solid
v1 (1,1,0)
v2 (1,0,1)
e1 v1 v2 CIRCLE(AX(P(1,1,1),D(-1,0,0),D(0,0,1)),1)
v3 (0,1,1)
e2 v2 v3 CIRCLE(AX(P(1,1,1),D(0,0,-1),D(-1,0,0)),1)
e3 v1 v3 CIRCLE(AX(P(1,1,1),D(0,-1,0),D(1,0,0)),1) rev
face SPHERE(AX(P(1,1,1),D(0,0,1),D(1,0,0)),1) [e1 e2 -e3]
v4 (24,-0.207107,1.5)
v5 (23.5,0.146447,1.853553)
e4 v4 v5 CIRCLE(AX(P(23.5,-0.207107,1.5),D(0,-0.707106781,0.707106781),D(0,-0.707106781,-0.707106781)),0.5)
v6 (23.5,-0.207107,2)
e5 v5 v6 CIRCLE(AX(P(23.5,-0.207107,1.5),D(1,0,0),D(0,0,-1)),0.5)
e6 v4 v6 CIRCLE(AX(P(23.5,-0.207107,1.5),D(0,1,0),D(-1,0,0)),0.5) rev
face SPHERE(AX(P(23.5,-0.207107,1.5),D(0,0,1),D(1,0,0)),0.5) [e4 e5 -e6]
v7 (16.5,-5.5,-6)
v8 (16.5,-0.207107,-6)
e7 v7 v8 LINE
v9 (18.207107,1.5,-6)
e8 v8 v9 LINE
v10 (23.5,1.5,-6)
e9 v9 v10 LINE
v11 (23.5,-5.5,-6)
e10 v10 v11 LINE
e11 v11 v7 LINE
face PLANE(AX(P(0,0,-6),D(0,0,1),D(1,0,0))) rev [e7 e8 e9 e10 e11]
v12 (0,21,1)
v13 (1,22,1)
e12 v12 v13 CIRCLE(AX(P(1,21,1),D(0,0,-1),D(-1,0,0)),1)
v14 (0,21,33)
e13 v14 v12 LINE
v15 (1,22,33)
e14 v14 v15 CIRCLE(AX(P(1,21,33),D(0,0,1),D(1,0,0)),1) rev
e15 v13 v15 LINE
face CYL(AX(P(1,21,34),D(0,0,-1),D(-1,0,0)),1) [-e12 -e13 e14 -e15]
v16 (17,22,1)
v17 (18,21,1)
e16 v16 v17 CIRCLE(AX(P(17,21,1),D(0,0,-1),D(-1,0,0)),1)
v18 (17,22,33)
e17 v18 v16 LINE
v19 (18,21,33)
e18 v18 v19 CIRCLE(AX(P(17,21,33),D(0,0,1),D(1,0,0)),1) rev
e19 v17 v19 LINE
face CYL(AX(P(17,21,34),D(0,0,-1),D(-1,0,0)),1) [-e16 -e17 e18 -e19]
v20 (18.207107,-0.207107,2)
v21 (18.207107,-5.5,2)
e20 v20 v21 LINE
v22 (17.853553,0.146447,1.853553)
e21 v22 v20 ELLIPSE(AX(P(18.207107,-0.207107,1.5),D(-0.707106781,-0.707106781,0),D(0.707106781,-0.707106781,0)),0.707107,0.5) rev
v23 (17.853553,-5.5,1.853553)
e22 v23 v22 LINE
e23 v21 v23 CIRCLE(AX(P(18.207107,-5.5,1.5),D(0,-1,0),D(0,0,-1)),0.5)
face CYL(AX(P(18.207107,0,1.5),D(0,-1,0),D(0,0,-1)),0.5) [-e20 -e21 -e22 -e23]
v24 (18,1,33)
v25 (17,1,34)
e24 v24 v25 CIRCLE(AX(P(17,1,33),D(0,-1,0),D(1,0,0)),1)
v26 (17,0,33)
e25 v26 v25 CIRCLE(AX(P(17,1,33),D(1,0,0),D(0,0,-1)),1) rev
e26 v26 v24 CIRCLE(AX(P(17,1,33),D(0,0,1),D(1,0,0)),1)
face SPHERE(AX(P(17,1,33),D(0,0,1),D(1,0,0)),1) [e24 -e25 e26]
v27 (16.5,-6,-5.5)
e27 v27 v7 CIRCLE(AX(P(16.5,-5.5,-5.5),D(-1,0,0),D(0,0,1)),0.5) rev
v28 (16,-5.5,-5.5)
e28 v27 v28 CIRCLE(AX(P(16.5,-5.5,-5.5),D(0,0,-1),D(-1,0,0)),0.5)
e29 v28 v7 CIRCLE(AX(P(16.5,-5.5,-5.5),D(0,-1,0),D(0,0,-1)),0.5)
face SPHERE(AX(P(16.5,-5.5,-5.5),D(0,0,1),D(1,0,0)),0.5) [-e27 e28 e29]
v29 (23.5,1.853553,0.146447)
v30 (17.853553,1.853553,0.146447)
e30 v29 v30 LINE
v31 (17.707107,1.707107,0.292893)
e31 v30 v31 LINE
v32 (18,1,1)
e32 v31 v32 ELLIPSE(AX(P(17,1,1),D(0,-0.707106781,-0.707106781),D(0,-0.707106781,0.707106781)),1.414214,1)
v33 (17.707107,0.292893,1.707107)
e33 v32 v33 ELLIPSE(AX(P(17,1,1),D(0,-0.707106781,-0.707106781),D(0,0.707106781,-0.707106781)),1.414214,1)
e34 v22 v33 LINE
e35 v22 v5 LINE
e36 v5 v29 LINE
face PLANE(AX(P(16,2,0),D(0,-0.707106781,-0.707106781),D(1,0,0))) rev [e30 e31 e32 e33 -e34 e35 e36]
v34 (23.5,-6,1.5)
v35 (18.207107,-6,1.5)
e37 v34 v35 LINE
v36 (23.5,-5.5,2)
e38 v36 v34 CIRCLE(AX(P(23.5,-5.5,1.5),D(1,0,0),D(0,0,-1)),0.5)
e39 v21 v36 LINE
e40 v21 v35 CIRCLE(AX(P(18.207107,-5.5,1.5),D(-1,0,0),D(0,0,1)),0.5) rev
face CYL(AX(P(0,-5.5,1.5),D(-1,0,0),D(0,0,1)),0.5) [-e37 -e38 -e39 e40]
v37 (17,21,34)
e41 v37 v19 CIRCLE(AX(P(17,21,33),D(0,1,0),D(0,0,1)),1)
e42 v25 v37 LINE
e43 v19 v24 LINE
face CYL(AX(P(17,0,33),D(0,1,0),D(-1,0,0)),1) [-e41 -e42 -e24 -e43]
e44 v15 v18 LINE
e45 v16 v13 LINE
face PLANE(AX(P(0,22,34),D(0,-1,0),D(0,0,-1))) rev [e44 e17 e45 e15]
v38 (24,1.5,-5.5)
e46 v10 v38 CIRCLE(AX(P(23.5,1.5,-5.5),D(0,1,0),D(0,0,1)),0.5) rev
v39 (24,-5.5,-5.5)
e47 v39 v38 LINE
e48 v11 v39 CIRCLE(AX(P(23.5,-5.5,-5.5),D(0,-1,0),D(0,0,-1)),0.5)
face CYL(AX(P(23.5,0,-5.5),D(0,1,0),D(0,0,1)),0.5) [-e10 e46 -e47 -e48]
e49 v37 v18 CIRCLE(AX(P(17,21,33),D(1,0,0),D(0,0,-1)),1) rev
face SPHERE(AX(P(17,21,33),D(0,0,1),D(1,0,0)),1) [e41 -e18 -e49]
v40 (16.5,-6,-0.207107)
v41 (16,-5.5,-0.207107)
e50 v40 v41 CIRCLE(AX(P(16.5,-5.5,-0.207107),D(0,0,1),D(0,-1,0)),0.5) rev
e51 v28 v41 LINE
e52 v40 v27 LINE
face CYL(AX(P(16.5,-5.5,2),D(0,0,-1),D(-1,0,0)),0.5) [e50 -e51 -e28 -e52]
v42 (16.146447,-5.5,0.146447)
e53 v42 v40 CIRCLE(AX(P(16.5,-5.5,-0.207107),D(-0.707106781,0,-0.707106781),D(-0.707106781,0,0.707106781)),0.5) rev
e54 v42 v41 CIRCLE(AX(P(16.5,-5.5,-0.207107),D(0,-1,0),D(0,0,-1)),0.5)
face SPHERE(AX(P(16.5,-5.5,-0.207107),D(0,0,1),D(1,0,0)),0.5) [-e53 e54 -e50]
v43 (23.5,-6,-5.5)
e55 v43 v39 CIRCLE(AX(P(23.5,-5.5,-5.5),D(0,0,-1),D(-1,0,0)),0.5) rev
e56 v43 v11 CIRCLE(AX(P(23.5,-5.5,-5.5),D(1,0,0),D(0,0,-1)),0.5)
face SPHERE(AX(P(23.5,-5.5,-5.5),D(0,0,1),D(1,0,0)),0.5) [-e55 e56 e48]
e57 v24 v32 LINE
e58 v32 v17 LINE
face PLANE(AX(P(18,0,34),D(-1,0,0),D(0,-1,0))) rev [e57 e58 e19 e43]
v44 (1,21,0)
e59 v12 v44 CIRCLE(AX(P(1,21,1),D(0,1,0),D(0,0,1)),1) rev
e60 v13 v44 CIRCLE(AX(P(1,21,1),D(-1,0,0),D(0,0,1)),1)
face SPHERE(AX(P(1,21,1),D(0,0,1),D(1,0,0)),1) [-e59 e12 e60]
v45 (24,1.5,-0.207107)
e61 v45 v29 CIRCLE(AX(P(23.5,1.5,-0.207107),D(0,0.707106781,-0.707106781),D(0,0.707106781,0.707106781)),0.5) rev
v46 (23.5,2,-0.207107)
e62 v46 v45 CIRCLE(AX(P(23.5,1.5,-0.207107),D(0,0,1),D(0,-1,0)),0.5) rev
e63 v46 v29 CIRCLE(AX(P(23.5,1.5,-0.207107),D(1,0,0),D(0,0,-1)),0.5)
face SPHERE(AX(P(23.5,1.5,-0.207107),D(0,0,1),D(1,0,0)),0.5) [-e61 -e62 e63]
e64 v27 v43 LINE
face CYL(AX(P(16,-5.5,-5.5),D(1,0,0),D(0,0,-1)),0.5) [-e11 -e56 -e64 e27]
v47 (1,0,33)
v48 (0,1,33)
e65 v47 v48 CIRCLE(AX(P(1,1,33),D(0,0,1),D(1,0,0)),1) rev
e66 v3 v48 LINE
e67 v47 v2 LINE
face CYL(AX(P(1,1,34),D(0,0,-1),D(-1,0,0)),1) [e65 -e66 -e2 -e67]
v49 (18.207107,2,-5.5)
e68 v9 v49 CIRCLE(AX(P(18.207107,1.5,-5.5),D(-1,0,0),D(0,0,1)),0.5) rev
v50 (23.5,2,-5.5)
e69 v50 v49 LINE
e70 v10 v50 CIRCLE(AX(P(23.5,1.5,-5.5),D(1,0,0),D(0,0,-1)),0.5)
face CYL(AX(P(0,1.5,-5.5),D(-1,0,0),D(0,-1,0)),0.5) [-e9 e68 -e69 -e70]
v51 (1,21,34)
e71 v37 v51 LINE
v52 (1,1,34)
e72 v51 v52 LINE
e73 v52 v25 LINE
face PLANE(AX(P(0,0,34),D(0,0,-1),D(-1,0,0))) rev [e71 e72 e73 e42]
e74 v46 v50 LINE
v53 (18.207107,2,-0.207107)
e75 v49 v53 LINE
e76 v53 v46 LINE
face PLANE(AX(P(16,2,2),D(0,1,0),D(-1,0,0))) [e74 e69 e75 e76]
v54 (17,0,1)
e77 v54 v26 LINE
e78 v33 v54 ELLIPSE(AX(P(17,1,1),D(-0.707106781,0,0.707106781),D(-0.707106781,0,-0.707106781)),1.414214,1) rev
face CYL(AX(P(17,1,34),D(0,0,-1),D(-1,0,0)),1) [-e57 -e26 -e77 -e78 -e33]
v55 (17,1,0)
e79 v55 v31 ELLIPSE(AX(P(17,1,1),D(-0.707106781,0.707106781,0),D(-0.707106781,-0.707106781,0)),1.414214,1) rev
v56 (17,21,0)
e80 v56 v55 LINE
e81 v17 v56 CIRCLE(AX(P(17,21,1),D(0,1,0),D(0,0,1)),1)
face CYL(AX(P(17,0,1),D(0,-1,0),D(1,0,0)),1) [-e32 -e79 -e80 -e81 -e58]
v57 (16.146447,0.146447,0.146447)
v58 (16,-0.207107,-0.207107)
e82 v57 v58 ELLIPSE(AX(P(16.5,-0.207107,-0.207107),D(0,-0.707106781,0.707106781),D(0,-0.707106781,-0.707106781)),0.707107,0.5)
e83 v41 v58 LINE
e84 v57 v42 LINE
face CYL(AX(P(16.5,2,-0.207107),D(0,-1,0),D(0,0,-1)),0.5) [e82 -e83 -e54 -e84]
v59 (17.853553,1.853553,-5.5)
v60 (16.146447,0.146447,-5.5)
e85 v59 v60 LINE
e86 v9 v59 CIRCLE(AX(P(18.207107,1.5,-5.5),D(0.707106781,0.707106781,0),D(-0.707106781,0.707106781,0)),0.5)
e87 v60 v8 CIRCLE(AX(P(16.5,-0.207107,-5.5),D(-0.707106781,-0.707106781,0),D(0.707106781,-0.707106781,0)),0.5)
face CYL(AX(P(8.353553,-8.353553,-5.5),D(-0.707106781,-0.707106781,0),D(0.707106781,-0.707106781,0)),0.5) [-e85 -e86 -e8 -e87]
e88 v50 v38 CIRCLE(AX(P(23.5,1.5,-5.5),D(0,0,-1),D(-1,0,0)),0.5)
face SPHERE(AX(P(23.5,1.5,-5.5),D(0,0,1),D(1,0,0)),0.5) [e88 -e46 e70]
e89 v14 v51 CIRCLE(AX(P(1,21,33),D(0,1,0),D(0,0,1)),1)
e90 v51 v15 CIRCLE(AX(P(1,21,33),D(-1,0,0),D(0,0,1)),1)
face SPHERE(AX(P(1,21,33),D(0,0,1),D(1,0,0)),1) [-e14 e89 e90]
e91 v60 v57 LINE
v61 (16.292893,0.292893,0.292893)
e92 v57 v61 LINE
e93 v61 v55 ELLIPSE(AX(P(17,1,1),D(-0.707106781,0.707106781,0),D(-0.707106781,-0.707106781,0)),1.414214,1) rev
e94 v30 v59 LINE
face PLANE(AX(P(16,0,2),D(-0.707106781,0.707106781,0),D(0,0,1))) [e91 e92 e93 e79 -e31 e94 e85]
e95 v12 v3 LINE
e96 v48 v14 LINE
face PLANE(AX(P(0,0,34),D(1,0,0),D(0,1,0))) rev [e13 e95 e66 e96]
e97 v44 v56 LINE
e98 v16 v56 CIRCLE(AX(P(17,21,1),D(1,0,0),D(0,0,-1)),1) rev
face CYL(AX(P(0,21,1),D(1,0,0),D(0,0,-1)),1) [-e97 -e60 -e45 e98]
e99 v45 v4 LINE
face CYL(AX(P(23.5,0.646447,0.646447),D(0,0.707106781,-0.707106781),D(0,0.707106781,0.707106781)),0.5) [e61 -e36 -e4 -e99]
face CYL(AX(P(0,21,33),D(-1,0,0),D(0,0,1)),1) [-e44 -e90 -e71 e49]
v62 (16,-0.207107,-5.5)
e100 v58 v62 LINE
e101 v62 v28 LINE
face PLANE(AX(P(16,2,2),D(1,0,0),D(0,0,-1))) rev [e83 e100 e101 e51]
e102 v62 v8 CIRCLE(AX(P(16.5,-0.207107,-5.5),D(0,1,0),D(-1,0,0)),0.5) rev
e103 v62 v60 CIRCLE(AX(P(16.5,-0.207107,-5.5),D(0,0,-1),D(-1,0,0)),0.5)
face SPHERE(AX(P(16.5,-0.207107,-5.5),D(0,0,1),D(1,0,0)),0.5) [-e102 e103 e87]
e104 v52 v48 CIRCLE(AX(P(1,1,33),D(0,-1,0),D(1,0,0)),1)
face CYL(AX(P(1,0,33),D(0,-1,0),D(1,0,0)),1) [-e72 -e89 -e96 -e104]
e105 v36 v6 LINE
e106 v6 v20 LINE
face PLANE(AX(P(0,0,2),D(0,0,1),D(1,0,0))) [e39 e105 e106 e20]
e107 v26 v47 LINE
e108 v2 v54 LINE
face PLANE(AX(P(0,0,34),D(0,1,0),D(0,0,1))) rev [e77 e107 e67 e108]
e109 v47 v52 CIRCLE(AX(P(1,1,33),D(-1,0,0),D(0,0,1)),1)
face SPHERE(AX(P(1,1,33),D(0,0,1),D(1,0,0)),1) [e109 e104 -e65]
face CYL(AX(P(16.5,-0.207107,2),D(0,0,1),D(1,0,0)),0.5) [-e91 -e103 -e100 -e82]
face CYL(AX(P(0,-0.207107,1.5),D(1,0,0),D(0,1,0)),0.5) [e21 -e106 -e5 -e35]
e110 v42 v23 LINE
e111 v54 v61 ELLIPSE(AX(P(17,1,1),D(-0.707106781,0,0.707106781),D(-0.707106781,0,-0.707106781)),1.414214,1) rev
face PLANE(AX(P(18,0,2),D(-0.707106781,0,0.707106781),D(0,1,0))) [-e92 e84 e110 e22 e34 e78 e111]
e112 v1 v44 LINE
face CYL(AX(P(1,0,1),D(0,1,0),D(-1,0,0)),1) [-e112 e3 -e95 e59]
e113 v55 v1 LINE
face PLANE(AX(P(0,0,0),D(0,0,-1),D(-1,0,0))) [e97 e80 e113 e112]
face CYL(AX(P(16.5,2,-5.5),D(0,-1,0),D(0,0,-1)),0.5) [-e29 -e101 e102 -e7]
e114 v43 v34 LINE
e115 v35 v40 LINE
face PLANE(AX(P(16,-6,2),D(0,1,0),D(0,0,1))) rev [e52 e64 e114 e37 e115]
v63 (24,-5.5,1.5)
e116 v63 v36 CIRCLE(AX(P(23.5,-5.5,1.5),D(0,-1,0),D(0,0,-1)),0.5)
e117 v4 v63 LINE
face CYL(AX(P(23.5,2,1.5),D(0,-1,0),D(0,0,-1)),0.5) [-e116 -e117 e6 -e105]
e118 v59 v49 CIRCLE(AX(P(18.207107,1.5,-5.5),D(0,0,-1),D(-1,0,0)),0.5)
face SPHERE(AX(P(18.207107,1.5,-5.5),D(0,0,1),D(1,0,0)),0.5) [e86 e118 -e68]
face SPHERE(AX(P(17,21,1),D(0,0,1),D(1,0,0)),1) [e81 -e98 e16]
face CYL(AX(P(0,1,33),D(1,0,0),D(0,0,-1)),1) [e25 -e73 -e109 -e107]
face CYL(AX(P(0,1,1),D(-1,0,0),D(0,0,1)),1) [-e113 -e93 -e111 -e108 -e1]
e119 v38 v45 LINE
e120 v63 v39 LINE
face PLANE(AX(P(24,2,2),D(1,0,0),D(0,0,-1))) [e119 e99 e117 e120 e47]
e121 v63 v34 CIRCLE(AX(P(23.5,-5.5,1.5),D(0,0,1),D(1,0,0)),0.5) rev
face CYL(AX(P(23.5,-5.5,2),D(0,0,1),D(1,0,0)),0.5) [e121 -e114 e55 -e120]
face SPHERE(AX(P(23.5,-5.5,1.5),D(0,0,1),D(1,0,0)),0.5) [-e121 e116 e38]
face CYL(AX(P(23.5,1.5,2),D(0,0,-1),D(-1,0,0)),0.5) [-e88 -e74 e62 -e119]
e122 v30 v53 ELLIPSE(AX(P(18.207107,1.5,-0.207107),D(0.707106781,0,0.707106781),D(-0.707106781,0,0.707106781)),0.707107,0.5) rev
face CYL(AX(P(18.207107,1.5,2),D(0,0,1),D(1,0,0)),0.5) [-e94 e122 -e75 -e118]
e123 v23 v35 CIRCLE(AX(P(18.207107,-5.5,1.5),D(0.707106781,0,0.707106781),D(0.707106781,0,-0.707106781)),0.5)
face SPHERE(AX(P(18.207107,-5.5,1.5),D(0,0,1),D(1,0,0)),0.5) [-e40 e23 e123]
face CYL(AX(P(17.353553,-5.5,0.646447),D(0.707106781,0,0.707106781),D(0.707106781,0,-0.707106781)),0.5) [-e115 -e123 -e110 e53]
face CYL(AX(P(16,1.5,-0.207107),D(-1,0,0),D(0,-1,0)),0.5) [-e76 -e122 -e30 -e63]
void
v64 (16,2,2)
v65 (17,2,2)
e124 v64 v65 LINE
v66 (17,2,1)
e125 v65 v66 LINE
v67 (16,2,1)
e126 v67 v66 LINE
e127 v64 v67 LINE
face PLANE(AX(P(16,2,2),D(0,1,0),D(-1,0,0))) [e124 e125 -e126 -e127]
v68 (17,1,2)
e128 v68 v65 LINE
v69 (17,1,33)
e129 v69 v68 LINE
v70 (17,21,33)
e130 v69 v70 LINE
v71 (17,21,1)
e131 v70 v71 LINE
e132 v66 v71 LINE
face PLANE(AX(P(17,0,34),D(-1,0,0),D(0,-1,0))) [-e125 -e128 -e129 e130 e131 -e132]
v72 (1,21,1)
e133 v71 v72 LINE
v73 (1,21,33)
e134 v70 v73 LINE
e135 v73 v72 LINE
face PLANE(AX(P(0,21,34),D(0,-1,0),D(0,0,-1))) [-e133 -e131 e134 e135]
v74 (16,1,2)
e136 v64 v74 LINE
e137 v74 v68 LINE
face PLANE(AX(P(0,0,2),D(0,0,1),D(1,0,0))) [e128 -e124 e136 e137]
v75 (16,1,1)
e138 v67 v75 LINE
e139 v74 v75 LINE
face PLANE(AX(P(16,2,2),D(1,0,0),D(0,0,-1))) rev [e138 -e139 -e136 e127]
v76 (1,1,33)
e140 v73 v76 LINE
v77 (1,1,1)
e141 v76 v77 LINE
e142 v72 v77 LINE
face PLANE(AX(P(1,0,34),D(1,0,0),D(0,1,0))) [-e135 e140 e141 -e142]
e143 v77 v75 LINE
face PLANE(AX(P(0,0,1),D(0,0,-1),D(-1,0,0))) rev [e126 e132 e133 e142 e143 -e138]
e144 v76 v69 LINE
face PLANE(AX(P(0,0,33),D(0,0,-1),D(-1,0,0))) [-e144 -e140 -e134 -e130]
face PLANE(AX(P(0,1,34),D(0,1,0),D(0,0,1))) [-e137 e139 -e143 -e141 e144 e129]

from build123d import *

# Parameters (mm, degrees)
SKETCH1_W                = 18
SKETCH1_H                = 22
BOSS_EXTRUDE1_DEPTH      = 34
SHELL1_T                 = 1
BOSS_EXTRUDE3_DEPTH      = 6
BOSS_EXTRUDE3_DEPTH_BACK = 2
SKETCH2_W                = 8
SKETCH2_H                = 8
CHAMFER2_SIZE            = 2
FILLET1_R                = 1
FILLET2_R                = 0.5


with BuildPart() as part:
    # Sketch1 → Boss-Extrude1 (new body)
    with BuildSketch(Plane.XY):
        with Locations((9, 11)):
            Rectangle(SKETCH1_W, SKETCH1_H)
    extrude(amount=BOSS_EXTRUDE1_DEPTH)

    # Shell1 (no face opened: a closed hollow body)
    add(offset(amount=-SHELL1_T, mode=Mode.PRIVATE), mode=Mode.SUBTRACT)

    # Sketch2 → Boss-Extrude3 (add, two sides: drawn at the far end of the back side and taken through both)
    with BuildSketch(Plane(origin=(0, 0, 0), x_dir=(-1, 0, 0), z_dir=(0, 0, -1)).offset(-BOSS_EXTRUDE3_DEPTH_BACK)):
        with Locations((-20, -2)):
            Rectangle(SKETCH2_W, SKETCH2_H)
    extrude(amount=BOSS_EXTRUDE3_DEPTH + BOSS_EXTRUDE3_DEPTH_BACK)

    # Chamfer2
    chamfer2_edges = [part.edges().sort_by_distance(p)[0] for p in [
        (16, -3, 2),
        (16, 2, -3),
        (21, 2, 2),
    ]]
    chamfer(chamfer2_edges, length=CHAMFER2_SIZE)

    # Fillet1
    # the kernel refuses this fillet: 1 mm, written as the material it takes off along each edge
    with BuildSketch(Plane(origin=(1, 21, 1), x_dir=(0, 1, 0), z_dir=(0, 0, -1))) as fillet1_piece_1_section:
        Polygon((0, 0), (FILLET1_R, 0), (FILLET1_R, -FILLET1_R), (0, -FILLET1_R), align=None)
    fillet1_piece_1 = extrude(amount=FILLET1_R, mode=Mode.PRIVATE)
    fillet1_piece_1 = fillet1_piece_1 - Plane(origin=(1, 21, 1), x_dir=(0.7071067811865476, -0.7071067811865475, 0), z_dir=(0, 0, -1)) * Sphere(FILLET1_R, mode=Mode.PRIVATE)
    add(fillet1_piece_1, mode=Mode.SUBTRACT)
    with BuildSketch(Plane(origin=(1, 1, 1), x_dir=(0, 0, -1), z_dir=(0, -1, 0))) as fillet1_piece_2_section:
        Polygon((0, 0), (FILLET1_R, 0), (FILLET1_R, -FILLET1_R), (0, -FILLET1_R), align=None)
    fillet1_piece_2 = extrude(amount=FILLET1_R, mode=Mode.PRIVATE)
    fillet1_piece_2 = fillet1_piece_2 - Plane(origin=(1, 1, 1), x_dir=(0.7071067811865475, 0, 0.7071067811865475), z_dir=(0, -1, 0)) * Sphere(FILLET1_R, mode=Mode.PRIVATE)
    add(fillet1_piece_2, mode=Mode.SUBTRACT)
    with BuildSketch(Plane(origin=(17, 21, 1), x_dir=(0, 0, -1), z_dir=(0, 1, 0))) as fillet1_piece_3_section:
        Polygon((0, 0), (FILLET1_R, 0), (FILLET1_R, -FILLET1_R), (0, -FILLET1_R), align=None)
    fillet1_piece_3 = extrude(amount=FILLET1_R, mode=Mode.PRIVATE)
    fillet1_piece_3 = fillet1_piece_3 - Plane(origin=(17, 21, 1), x_dir=(-0.7071067811865475, 0, 0.7071067811865475), z_dir=(0, 1, 0)) * Sphere(FILLET1_R, mode=Mode.PRIVATE)
    add(fillet1_piece_3, mode=Mode.SUBTRACT)
    with BuildSketch(Plane(origin=(1, 1, 33), x_dir=(-1, 0, 0), z_dir=(0, -1, 0))) as fillet1_piece_4_section:
        Polygon((0, 0), (FILLET1_R, 0), (FILLET1_R, -FILLET1_R), (0, -FILLET1_R), align=None)
    fillet1_piece_4 = extrude(amount=FILLET1_R, mode=Mode.PRIVATE)
    fillet1_piece_4 = fillet1_piece_4 - Plane(origin=(1, 1, 33), x_dir=(0.7071067811865475, 0, -0.7071067811865475), z_dir=(0, -1, 0)) * Sphere(FILLET1_R, mode=Mode.PRIVATE)
    add(fillet1_piece_4, mode=Mode.SUBTRACT)
    with BuildSketch(Plane(origin=(17, 1, 33), x_dir=(1, 0, 0), z_dir=(0, -1, 0))) as fillet1_piece_5_section:
        Polygon((0, 0), (FILLET1_R, 0), (FILLET1_R, FILLET1_R), (0, FILLET1_R), align=None)
    fillet1_piece_5 = extrude(amount=FILLET1_R, mode=Mode.PRIVATE)
    fillet1_piece_5 = fillet1_piece_5 - Plane(origin=(17, 1, 33), x_dir=(-0.7071067811865475, 0, -0.7071067811865475), z_dir=(0, -1, 0)) * Sphere(FILLET1_R, mode=Mode.PRIVATE)
    add(fillet1_piece_5, mode=Mode.SUBTRACT)
    with BuildSketch(Plane(origin=(17, 21, 33), x_dir=(1, 0, 0), z_dir=(0, 1, 0))) as fillet1_piece_6_section:
        Polygon((0, 0), (FILLET1_R, 0), (FILLET1_R, -FILLET1_R), (0, -FILLET1_R), align=None)
    fillet1_piece_6 = extrude(amount=FILLET1_R, mode=Mode.PRIVATE)
    fillet1_piece_6 = fillet1_piece_6 - Plane(origin=(17, 21, 33), x_dir=(-0.7071067811865475, 0, -0.7071067811865475), z_dir=(0, 1, 0)) * Sphere(FILLET1_R, mode=Mode.PRIVATE)
    add(fillet1_piece_6, mode=Mode.SUBTRACT)
    with BuildSketch(Plane(origin=(1, 21, 33), x_dir=(-1, 0, 0), z_dir=(0, 1, 0))) as fillet1_piece_7_section:
        Polygon((0, 0), (FILLET1_R, 0), (FILLET1_R, FILLET1_R), (0, FILLET1_R), align=None)
    fillet1_piece_7 = extrude(amount=FILLET1_R, mode=Mode.PRIVATE)
    fillet1_piece_7 = fillet1_piece_7 - Plane(origin=(1, 21, 33), x_dir=(0.7071067811865475, 0, -0.7071067811865475), z_dir=(0, 1, 0)) * Sphere(FILLET1_R, mode=Mode.PRIVATE)
    add(fillet1_piece_7, mode=Mode.SUBTRACT)
    with BuildSketch(Plane(origin=(0, 21, 0), x_dir=(1, 0, 0), z_dir=(0, -1, 0)), Plane(origin=(18, 1, 34), x_dir=(0, 0, -1), z_dir=(0, 1, 0)), Plane(origin=(0, 21, 34), x_dir=(0, 0, -1), z_dir=(0, -1, 0))) as fillet1_piece_8:
        with BuildLine():
            CenterArc((FILLET1_R, FILLET1_R), FILLET1_R, 180, 90)
            Line((0, FILLET1_R), (0, 0))
            Line((0, 0), (FILLET1_R, 0))
        make_face()
    extrude(amount=20, mode=Mode.SUBTRACT)
    with BuildSketch(Plane(origin=(1, 0, 0), x_dir=(0, 0, 1), z_dir=(1, 0, 0))) as fillet1_piece_9_section:
        with BuildLine():
            CenterArc((FILLET1_R, -FILLET1_R), FILLET1_R, 90, 90)
            Line((0, -FILLET1_R), (0, 0))
            Line((0, 0), (FILLET1_R, 0))
        make_face()
    fillet1_piece_9 = extrude(amount=17.5, mode=Mode.PRIVATE)
    fillet1_piece_9 = split(fillet1_piece_9, bisect_by=Plane(origin=(12.381861728, 0.226424858, -3.618138272), z_dir=(-0.7071067811865476, 0, 0.7071067811865476)), keep=Keep.TOP, mode=Mode.PRIVATE)
    fillet1_piece_9 = split(fillet1_piece_9, bisect_by=Plane(origin=(12.381861728, -3.618138272, 0.226424858), z_dir=(-0.7071067811865476, 0.7071067811865476, 0)), keep=Keep.TOP, mode=Mode.PRIVATE)
    add(fillet1_piece_9, mode=Mode.SUBTRACT)
    with BuildSketch(Plane(origin=(1, 0, 0), x_dir=(0, 0, 1), z_dir=(1, 0, 0))) as fillet1_piece_10_section:
        with BuildLine():
            CenterArc((FILLET1_R, -FILLET1_R), FILLET1_R, 90, 90)
            Line((0, -FILLET1_R), (0, 0))
            Line((0, 0), (FILLET1_R, 0))
        make_face()
    fillet1_piece_10 = extrude(amount=17.5, mode=Mode.PRIVATE)
    fillet1_piece_10 = split(fillet1_piece_10, bisect_by=Plane(origin=(16.16446835, 0.528927527, 0.16446835), z_dir=(0.7071067811865476, 0, -0.7071067811865476)), keep=Keep.TOP, mode=Mode.PRIVATE)
    fillet1_piece_10 = split(fillet1_piece_10, bisect_by=Plane(origin=(16.407441135, 0.407441135, 0.042981958), z_dir=(-0.7071067811865476, 0.7071067811865476, 0)), keep=Keep.TOP, mode=Mode.PRIVATE)
    add(fillet1_piece_10, mode=Mode.SUBTRACT)
    with BuildSketch(Plane(origin=(1, 0, 0), x_dir=(0, 0, 1), z_dir=(1, 0, 0))) as fillet1_piece_11_section:
        with BuildLine():
            CenterArc((FILLET1_R, -FILLET1_R), FILLET1_R, 90, 90)
            Line((0, -FILLET1_R), (0, 0))
            Line((0, 0), (FILLET1_R, 0))
        make_face()
    fillet1_piece_11 = extrude(amount=17.5, mode=Mode.PRIVATE)
    fillet1_piece_11 = split(fillet1_piece_11, bisect_by=Plane(origin=(16.407441135, 0.042981958, 0.407441135), z_dir=(-0.7071067811865476, 0, 0.7071067811865476)), keep=Keep.TOP, mode=Mode.PRIVATE)
    fillet1_piece_11 = split(fillet1_piece_11, bisect_by=Plane(origin=(16.16446835, 0.16446835, 0.528927527), z_dir=(0.7071067811865476, -0.7071067811865476, 0)), keep=Keep.TOP, mode=Mode.PRIVATE)
    add(fillet1_piece_11, mode=Mode.SUBTRACT)
    with BuildSketch(Plane(origin=(18, -0.5, 0), x_dir=(-1, 0, 0), z_dir=(0, 1, 0))) as fillet1_piece_12_section:
        with BuildLine():
            CenterArc((FILLET1_R, FILLET1_R), FILLET1_R, 180, 90)
            Line((0, FILLET1_R), (0, 0))
            Line((0, 0), (FILLET1_R, 0))
        make_face()
    fillet1_piece_12 = extrude(amount=21.5, mode=Mode.PRIVATE)
    fillet1_piece_12 = split(fillet1_piece_12, bisect_by=Plane(origin=(17.83553165, 1.83553165, 0.528927527), z_dir=(0.7071067811865476, -0.7071067811865476, 0)), keep=Keep.TOP, mode=Mode.PRIVATE)
    fillet1_piece_12 = split(fillet1_piece_12, bisect_by=Plane(origin=(17.957018042, 1.592558865, 0.407441135), z_dir=(0, 0.7071067811865476, 0.7071067811865476)), keep=Keep.TOP, mode=Mode.PRIVATE)
    add(fillet1_piece_12, mode=Mode.SUBTRACT)
    with BuildSketch(Plane(origin=(18, -0.5, 0), x_dir=(-1, 0, 0), z_dir=(0, 1, 0))) as fillet1_piece_13_section:
        with BuildLine():
            CenterArc((FILLET1_R, FILLET1_R), FILLET1_R, 180, 90)
            Line((0, FILLET1_R), (0, 0))
            Line((0, 0), (FILLET1_R, 0))
        make_face()
    fillet1_piece_13 = extrude(amount=21.5, mode=Mode.PRIVATE)
    fillet1_piece_13 = split(fillet1_piece_13, bisect_by=Plane(origin=(17.592558865, 1.592558865, 0.042981958), z_dir=(-0.7071067811865476, 0.7071067811865476, 0)), keep=Keep.TOP, mode=Mode.PRIVATE)
    fillet1_piece_13 = split(fillet1_piece_13, bisect_by=Plane(origin=(17.471072473, 1.83553165, 0.16446835), z_dir=(0, -0.7071067811865476, -0.7071067811865476)), keep=Keep.TOP, mode=Mode.PRIVATE)
    add(fillet1_piece_13, mode=Mode.SUBTRACT)
    with BuildSketch(Plane(origin=(18, -0.5, 0), x_dir=(-1, 0, 0), z_dir=(0, 1, 0))) as fillet1_piece_14_section:
        with BuildLine():
            CenterArc((FILLET1_R, FILLET1_R), FILLET1_R, 180, 90)
            Line((0, FILLET1_R), (0, 0))
            Line((0, 0), (FILLET1_R, 0))
        make_face()
    fillet1_piece_14 = extrude(amount=21.5, mode=Mode.PRIVATE)
    fillet1_piece_14 = split(fillet1_piece_14, bisect_by=Plane(origin=(22.618159496, 6.618159496, 0.226418621), z_dir=(-0.7071067811865476, 0.7071067811865476, 0)), keep=Keep.TOP, mode=Mode.PRIVATE)
    fillet1_piece_14 = split(fillet1_piece_14, bisect_by=Plane(origin=(17.773581379, 6.618159496, -4.618159496), z_dir=(0, 0.7071067811865476, 0.7071067811865476)), keep=Keep.TOP, mode=Mode.PRIVATE)
    add(fillet1_piece_14, mode=Mode.SUBTRACT)
    with BuildSketch(Plane(origin=(17, 22, 0), x_dir=(0, -1, 0), z_dir=(-1, 0, 0)), Plane(origin=(1, 0, 34), x_dir=(0, 0, -1), z_dir=(1, 0, 0))) as fillet1_piece_15:
        with BuildLine():
            CenterArc((FILLET1_R, FILLET1_R), FILLET1_R, 180, 90)
            Line((0, FILLET1_R), (0, 0))
            Line((0, 0), (FILLET1_R, 0))
        make_face()
    extrude(amount=16, mode=Mode.SUBTRACT)
    with BuildSketch(Plane(origin=(17, 22, 34), x_dir=(0, -1, 0), z_dir=(-1, 0, 0))) as fillet1_piece_16:
        with BuildLine():
            CenterArc((FILLET1_R, -FILLET1_R), FILLET1_R, 90, 90)
            Line((0, -FILLET1_R), (0, 0))
            Line((0, 0), (FILLET1_R, 0))
        make_face()
    extrude(amount=16, mode=Mode.SUBTRACT)
    with BuildSketch(Plane(origin=(0, 22, 1), x_dir=(0, -1, 0), z_dir=(0, 0, 1)), Plane(origin=(0, 0, 1), x_dir=(1, 0, 0), z_dir=(0, 0, 1))) as fillet1_piece_17:
        with BuildLine():
            CenterArc((FILLET1_R, FILLET1_R), FILLET1_R, 180, 90)
            Line((0, FILLET1_R), (0, 0))
            Line((0, 0), (FILLET1_R, 0))
        make_face()
    extrude(amount=32, mode=Mode.SUBTRACT)
    with BuildSketch(Plane(origin=(18, 22, 1), x_dir=(0, -1, 0), z_dir=(0, 0, 1))) as fillet1_piece_18:
        with BuildLine():
            CenterArc((FILLET1_R, -FILLET1_R), FILLET1_R, 90, 90)
            Line((0, -FILLET1_R), (0, 0))
            Line((0, 0), (FILLET1_R, 0))
        make_face()
    extrude(amount=32, mode=Mode.SUBTRACT)
    with BuildSketch(Plane(origin=(18, 0, -0.5), x_dir=(-1, 0, 0), z_dir=(0, 0, 1))) as fillet1_piece_19_section:
        with BuildLine():
            CenterArc((FILLET1_R, -FILLET1_R), FILLET1_R, 90, 90)
            Line((0, -FILLET1_R), (0, 0))
            Line((0, 0), (FILLET1_R, 0))
        make_face()
    fillet1_piece_19 = extrude(amount=33.5, mode=Mode.PRIVATE)
    fillet1_piece_19 = split(fillet1_piece_19, bisect_by=Plane(origin=(17.83553165, 0.528927527, 1.83553165), z_dir=(0.7071067811865476, 0, -0.7071067811865476)), keep=Keep.TOP, mode=Mode.PRIVATE)
    fillet1_piece_19 = split(fillet1_piece_19, bisect_by=Plane(origin=(17.957018042, 0.407441135, 1.592558865), z_dir=(0, 0.7071067811865476, 0.7071067811865476)), keep=Keep.TOP, mode=Mode.PRIVATE)
    add(fillet1_piece_19, mode=Mode.SUBTRACT)
    with BuildSketch(Plane(origin=(18, 0, -0.5), x_dir=(-1, 0, 0), z_dir=(0, 0, 1))) as fillet1_piece_20_section:
        with BuildLine():
            CenterArc((FILLET1_R, -FILLET1_R), FILLET1_R, 90, 90)
            Line((0, -FILLET1_R), (0, 0))
            Line((0, 0), (FILLET1_R, 0))
        make_face()
    fillet1_piece_20 = extrude(amount=33.5, mode=Mode.PRIVATE)
    fillet1_piece_20 = split(fillet1_piece_20, bisect_by=Plane(origin=(17.592558865, 0.042981958, 1.592558865), z_dir=(-0.7071067811865476, 0, 0.7071067811865476)), keep=Keep.TOP, mode=Mode.PRIVATE)
    fillet1_piece_20 = split(fillet1_piece_20, bisect_by=Plane(origin=(17.471072473, 0.16446835, 1.83553165), z_dir=(0, -0.7071067811865476, -0.7071067811865476)), keep=Keep.TOP, mode=Mode.PRIVATE)
    add(fillet1_piece_20, mode=Mode.SUBTRACT)
    with BuildSketch(Plane(origin=(18, 0, -0.5), x_dir=(-1, 0, 0), z_dir=(0, 0, 1))) as fillet1_piece_21_section:
        with BuildLine():
            CenterArc((FILLET1_R, -FILLET1_R), FILLET1_R, 90, 90)
            Line((0, -FILLET1_R), (0, 0))
            Line((0, 0), (FILLET1_R, 0))
        make_face()
    fillet1_piece_21 = extrude(amount=33.5, mode=Mode.PRIVATE)
    fillet1_piece_21 = split(fillet1_piece_21, bisect_by=Plane(origin=(25.618190384, 0.226409543, 9.618190384), z_dir=(-0.7071067811865476, 0, 0.7071067811865476)), keep=Keep.TOP, mode=Mode.PRIVATE)
    fillet1_piece_21 = split(fillet1_piece_21, bisect_by=Plane(origin=(17.773590457, -7.618190384, 9.618190384), z_dir=(0, 0.7071067811865476, 0.7071067811865476)), keep=Keep.TOP, mode=Mode.PRIVATE)
    add(fillet1_piece_21, mode=Mode.SUBTRACT)

    # Fillet2
    fillet2_edges = [part.edges().sort_by_distance(p)[0] for p in [
        (20, -6, -6),
        (24, -6, -2),
        (24, -2, -6),
        (24, 2, -3),
        (21, 2, -6),
        (18, 2, -3),
        (21, 2, 0),
        (24, -3, 2),
        (24, 1, 1),
        (21, -6, 2),
        (18, -3, 2),
        (21, 0, 2),
        (16, -3, -6),
        (16, -6, -3),
        (16, -3, 0),
        (16, 0, -3),
        (17, 1, -6),
        (17, -6, 1),
    ]]
    fillet(fillet2_edges, radius=FILLET2_R)


solid = part.part
